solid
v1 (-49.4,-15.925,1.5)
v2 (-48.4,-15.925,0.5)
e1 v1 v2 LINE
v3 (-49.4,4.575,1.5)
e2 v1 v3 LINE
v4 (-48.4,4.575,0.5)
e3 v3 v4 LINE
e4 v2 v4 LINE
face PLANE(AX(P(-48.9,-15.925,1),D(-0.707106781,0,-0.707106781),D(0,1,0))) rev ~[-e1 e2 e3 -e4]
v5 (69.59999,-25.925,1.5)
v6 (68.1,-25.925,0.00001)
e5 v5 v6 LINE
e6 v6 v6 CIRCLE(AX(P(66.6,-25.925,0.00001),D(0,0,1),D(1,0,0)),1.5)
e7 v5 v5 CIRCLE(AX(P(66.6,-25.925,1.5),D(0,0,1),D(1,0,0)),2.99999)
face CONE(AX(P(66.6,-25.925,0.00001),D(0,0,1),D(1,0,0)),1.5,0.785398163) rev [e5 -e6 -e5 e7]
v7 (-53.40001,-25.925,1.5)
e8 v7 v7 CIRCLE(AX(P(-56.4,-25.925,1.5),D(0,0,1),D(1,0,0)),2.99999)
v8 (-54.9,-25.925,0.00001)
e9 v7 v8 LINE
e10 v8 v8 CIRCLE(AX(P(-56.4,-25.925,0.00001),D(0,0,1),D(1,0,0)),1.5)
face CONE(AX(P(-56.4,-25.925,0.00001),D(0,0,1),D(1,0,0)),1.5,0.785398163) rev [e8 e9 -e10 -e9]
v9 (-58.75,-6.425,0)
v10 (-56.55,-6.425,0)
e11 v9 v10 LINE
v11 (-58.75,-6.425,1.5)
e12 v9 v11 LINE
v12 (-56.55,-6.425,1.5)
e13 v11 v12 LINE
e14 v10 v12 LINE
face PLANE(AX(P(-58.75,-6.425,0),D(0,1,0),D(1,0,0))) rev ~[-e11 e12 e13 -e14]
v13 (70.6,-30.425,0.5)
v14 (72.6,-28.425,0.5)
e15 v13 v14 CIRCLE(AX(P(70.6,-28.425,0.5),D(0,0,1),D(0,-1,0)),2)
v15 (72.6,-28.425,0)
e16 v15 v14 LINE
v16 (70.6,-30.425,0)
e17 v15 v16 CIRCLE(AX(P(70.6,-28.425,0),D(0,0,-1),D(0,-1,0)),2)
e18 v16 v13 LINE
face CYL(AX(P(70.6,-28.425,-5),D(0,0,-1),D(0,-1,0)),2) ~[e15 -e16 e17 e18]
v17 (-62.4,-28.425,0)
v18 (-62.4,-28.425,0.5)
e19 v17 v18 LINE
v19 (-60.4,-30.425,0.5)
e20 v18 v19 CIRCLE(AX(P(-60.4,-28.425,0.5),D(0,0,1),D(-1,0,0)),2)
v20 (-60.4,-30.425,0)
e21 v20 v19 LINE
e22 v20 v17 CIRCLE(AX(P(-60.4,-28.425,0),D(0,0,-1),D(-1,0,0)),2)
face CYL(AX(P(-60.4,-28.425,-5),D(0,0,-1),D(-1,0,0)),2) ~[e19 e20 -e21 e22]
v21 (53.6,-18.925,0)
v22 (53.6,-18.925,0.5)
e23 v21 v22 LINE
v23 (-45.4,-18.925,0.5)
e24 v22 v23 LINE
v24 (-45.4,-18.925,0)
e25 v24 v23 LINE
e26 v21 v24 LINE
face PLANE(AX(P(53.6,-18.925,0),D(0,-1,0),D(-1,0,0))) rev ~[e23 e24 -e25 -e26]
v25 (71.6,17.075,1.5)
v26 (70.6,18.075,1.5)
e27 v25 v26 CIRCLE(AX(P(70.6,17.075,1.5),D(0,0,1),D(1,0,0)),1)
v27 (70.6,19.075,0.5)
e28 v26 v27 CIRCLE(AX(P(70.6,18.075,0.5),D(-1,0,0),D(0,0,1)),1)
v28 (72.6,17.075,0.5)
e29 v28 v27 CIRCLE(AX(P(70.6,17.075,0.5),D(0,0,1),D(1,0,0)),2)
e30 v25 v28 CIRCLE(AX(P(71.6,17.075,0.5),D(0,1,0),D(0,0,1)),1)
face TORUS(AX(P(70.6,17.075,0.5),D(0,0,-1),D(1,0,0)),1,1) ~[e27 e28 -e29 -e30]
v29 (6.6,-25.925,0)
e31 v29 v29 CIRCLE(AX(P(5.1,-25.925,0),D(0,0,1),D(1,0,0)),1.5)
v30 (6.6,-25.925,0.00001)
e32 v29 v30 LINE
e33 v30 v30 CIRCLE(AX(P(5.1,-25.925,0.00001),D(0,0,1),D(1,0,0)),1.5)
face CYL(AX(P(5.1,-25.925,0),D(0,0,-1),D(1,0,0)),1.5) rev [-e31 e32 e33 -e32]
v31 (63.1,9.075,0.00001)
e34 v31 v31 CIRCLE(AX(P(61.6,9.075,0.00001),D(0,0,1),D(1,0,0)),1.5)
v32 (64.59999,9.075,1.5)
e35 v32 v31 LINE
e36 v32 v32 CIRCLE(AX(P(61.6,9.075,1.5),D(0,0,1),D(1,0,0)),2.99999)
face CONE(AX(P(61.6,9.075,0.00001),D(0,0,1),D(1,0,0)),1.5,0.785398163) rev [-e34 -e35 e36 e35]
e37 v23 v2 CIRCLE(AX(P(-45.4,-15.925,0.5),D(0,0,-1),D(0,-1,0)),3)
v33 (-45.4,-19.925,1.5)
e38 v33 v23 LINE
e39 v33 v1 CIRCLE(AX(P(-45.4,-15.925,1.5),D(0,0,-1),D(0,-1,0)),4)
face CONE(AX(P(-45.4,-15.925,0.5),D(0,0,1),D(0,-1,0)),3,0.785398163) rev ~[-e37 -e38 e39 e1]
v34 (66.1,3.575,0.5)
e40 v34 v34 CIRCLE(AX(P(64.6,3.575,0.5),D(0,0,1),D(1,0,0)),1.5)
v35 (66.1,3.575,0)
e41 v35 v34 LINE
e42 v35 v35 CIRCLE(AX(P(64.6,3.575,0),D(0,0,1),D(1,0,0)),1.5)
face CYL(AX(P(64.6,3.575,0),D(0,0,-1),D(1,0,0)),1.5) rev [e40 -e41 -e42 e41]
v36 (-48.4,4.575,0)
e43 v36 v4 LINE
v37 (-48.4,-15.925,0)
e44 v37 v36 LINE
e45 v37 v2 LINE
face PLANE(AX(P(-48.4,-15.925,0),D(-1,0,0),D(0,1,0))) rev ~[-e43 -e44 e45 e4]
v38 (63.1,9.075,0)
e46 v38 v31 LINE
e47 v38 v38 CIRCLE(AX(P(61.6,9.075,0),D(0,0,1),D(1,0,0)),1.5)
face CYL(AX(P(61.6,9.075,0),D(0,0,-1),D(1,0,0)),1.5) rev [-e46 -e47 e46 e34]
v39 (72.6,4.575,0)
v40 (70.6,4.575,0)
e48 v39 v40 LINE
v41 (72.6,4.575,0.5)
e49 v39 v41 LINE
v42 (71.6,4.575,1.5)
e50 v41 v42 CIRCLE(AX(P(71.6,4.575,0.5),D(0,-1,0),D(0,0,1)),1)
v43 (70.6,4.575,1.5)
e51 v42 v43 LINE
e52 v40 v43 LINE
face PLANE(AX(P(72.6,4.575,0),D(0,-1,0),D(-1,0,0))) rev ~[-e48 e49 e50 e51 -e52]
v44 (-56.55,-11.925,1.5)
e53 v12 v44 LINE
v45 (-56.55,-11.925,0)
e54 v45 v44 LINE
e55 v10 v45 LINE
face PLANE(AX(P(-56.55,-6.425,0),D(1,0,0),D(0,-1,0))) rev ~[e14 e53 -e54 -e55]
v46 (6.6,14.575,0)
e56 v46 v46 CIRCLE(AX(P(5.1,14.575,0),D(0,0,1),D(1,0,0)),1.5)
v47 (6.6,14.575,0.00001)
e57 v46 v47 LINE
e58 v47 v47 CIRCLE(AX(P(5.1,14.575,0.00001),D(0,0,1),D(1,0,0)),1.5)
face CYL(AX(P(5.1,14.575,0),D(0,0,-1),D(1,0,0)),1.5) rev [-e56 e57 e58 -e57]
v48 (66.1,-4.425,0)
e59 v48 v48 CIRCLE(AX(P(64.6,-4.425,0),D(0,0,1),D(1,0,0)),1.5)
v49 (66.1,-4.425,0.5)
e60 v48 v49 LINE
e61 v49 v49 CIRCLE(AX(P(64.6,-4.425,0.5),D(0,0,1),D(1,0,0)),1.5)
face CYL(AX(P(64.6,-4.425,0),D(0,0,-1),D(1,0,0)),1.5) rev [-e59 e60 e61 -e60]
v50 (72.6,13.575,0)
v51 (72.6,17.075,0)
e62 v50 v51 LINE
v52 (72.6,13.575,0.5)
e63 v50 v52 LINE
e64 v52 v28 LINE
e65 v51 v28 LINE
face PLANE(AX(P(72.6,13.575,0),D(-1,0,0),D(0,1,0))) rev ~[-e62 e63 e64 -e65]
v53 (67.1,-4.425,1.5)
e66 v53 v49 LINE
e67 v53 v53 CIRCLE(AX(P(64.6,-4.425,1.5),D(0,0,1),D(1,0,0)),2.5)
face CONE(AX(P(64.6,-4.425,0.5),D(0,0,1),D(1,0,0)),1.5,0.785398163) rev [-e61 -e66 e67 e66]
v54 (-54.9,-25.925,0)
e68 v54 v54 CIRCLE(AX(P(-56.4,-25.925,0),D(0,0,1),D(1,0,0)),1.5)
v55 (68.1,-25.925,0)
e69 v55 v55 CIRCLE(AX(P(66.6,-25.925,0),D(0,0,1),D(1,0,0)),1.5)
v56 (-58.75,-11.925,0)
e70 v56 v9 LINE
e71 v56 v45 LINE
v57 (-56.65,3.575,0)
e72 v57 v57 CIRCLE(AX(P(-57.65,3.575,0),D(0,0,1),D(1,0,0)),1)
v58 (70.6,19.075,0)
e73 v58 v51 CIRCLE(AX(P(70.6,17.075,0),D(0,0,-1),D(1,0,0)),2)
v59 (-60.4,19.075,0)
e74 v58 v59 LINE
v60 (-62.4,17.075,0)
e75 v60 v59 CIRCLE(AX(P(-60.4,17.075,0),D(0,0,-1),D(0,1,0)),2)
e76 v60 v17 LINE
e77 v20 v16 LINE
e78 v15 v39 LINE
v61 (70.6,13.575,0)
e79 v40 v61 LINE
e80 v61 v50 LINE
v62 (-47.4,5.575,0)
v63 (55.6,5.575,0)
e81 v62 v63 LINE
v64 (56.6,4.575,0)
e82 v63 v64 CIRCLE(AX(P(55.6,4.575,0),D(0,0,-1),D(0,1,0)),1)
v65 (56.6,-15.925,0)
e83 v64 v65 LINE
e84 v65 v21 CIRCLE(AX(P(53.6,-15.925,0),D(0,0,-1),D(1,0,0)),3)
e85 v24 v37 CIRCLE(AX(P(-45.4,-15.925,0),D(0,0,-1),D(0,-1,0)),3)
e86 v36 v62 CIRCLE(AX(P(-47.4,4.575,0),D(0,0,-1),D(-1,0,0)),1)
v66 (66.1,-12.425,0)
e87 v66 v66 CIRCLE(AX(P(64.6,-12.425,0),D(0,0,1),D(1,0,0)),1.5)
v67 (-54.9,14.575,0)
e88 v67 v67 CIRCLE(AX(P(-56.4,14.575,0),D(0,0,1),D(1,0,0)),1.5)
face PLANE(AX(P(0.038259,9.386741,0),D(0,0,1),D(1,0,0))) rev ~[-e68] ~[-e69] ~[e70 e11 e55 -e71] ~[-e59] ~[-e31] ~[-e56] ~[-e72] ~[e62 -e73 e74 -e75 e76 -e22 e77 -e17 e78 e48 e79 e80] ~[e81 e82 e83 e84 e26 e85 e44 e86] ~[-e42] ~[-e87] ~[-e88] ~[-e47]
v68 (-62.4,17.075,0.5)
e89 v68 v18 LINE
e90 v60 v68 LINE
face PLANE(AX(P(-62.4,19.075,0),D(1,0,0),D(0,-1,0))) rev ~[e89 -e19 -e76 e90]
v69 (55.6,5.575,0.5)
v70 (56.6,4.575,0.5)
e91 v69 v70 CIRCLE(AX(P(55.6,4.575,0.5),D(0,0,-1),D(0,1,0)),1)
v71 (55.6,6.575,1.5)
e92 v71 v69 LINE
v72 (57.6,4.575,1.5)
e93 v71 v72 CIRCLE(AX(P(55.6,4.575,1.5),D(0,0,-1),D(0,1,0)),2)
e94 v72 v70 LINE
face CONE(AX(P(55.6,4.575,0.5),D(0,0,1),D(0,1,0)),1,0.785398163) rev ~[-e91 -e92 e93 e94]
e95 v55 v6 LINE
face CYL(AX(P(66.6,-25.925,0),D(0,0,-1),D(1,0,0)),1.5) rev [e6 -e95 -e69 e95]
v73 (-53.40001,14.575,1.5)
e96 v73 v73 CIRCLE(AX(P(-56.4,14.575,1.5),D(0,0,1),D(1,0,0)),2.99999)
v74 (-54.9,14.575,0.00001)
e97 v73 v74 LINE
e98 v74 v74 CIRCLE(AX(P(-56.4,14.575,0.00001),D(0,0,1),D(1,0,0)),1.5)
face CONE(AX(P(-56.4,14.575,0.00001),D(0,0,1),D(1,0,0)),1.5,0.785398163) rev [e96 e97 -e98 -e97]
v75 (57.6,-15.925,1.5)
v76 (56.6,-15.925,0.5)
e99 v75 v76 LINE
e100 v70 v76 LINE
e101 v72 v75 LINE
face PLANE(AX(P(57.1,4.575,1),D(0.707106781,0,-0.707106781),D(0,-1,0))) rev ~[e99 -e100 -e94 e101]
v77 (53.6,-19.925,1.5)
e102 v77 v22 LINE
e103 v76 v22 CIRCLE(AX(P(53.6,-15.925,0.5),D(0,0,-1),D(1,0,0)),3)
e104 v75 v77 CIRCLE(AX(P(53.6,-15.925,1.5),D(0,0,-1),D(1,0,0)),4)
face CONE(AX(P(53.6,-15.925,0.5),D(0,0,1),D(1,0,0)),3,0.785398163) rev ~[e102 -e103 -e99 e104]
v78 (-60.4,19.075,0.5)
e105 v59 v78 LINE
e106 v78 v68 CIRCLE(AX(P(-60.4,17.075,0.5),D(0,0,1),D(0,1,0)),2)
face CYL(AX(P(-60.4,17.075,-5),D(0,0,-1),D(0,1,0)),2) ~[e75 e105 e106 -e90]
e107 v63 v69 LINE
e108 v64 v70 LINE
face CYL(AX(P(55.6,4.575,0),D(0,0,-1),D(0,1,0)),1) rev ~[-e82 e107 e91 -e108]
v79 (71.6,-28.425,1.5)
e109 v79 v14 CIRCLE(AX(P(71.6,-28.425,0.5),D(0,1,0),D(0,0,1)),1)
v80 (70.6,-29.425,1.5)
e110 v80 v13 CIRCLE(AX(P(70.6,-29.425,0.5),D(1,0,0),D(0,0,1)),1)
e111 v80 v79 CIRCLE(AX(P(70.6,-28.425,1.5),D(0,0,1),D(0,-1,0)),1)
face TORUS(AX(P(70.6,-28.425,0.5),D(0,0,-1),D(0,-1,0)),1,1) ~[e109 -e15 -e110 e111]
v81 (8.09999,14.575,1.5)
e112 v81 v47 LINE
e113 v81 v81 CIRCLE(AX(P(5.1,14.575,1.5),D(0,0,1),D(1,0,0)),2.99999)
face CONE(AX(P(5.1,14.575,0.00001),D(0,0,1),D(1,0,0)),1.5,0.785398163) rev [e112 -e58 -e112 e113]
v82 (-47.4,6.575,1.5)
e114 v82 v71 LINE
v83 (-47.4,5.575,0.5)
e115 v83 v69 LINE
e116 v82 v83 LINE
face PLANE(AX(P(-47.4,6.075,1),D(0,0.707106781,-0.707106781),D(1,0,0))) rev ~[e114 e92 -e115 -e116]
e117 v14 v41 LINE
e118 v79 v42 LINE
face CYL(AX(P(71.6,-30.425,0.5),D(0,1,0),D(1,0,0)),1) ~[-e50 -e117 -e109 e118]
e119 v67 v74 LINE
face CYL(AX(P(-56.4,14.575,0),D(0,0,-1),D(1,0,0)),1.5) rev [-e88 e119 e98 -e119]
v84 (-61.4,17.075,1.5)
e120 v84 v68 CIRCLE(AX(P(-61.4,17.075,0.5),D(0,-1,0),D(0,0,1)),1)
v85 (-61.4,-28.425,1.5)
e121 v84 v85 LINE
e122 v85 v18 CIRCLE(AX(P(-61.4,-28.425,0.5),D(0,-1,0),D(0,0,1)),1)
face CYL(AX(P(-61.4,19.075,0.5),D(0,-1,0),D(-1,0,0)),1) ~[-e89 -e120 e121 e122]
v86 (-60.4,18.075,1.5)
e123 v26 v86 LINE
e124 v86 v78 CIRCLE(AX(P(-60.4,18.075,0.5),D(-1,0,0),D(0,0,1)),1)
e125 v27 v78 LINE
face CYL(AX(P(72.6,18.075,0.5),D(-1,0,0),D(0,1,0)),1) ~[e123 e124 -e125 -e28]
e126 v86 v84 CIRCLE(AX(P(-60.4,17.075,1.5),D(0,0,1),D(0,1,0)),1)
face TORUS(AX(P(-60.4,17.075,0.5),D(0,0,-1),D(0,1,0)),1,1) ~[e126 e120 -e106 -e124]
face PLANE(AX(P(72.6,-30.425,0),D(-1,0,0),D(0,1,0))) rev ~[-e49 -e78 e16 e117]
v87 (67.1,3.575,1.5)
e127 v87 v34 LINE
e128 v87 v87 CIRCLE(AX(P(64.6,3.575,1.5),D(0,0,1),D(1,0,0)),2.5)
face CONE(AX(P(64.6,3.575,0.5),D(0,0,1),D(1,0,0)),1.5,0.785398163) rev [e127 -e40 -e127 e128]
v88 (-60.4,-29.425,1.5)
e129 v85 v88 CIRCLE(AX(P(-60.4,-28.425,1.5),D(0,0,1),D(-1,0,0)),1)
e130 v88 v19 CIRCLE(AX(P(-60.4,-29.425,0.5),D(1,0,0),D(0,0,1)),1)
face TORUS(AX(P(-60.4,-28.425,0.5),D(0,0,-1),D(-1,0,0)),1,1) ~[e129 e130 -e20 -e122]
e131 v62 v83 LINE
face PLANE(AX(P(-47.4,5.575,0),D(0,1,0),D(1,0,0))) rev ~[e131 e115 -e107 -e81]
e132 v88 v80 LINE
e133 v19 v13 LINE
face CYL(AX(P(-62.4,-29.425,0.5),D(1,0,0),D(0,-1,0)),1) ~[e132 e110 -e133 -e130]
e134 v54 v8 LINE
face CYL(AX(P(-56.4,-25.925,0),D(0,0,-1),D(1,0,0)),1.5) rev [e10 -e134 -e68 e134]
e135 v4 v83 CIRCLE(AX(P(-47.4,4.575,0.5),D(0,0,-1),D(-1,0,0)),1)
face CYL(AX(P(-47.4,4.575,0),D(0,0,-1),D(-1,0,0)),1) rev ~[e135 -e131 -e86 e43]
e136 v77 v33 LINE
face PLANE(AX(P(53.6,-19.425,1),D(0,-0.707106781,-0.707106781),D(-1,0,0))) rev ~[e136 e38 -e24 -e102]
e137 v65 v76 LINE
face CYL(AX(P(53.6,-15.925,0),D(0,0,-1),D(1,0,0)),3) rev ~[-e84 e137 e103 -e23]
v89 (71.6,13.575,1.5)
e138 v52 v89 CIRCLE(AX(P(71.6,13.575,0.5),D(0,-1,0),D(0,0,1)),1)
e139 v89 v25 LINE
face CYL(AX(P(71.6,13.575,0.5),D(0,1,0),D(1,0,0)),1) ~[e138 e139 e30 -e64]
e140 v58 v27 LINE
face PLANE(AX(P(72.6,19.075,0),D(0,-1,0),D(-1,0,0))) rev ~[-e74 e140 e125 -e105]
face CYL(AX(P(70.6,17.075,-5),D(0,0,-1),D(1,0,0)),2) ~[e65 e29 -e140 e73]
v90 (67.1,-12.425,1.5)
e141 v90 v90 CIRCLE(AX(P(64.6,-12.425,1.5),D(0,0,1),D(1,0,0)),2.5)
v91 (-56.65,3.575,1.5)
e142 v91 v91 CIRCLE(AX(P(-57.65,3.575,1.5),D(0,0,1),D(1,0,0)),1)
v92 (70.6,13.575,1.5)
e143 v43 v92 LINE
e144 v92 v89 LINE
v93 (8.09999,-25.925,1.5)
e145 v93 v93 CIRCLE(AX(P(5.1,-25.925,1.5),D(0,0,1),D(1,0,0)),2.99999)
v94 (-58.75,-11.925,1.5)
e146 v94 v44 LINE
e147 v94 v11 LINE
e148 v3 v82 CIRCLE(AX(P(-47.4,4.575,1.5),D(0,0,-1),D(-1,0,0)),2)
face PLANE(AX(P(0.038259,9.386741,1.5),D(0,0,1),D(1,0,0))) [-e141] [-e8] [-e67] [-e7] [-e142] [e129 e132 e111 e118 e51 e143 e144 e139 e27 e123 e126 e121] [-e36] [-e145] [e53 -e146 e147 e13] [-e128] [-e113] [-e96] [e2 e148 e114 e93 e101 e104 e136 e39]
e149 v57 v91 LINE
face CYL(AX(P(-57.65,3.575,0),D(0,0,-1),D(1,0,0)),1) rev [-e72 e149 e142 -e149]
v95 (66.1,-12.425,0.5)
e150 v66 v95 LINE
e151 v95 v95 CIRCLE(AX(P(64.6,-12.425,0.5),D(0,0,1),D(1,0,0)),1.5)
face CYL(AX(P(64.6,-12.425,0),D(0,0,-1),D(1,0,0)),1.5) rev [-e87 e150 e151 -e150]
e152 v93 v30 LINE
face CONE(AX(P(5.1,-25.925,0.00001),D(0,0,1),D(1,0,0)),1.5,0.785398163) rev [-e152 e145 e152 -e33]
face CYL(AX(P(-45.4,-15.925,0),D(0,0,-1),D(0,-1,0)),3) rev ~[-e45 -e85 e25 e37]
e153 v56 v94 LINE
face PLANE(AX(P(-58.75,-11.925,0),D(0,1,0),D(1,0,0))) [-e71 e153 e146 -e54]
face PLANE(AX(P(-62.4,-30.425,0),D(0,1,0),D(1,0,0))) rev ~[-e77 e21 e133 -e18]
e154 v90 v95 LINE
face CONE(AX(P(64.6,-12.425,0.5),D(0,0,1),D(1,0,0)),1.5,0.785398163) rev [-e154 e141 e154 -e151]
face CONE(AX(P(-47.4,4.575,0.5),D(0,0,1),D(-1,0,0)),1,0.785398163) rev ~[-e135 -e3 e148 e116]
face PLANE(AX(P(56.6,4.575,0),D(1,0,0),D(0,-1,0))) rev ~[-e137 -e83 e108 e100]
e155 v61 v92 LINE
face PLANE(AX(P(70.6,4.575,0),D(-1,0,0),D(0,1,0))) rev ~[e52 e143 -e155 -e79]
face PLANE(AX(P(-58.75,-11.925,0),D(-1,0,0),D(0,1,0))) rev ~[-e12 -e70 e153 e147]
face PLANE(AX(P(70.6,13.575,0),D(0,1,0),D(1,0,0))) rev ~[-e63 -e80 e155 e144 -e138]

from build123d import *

# Parameters (mm, degrees)
F0_W         = 112.5
F0_H         = 7
F0_R         = 1.5
F0_W_2       = 135
F0_W_3       = 2
F0_H_2       = 2
F0_H_3       = 9
F0_W_4       = 5.5
F0_R_2       = 1
F0_W_5       = 2.2
F0_H_4       = 3.5
F0_H_5       = 9.5
F1_DEPTH     = 1.5
F2_R         = 1
F3_T1_DEPTH  = 6.5
F3_T4_ANGLE  = 90
F3_T6_ANGLE  = 90
F3_T8_ANGLE  = 90
F3_T10_ANGLE = 90
F4_SIZE      = 1
F5_SIZE      = 1
F6_SIZE      = 1.49999


# Not quite as in the source:
# - a fillet or chamfer that OpenCascade refuses, or shapes differently, is made with other operations: its cross-section is extruded or revolved along the edge and cut away or added
# - a fillet or chamfer is up to 0.001 mm smaller than in the source, because OpenCascade refuses the exact size
# - a feature names something its author has since deleted; it is built from what else it names


with BuildPart() as f1:
    # F0 (on Top) → F1 (new body)
    with BuildSketch(Plane.XY):
        Polygon((54.1, 8.075), (54.1, 17.075), (52.1, 17.075), (52.1, 10.075), (-60.4, 10.075), (-60.4, 8.075), (-54.9, 8.075), align=None)
        Polygon((-60.4, 17.075), (52.1, 17.075), (52.1, 19.075), (-62.4, 19.075), (-62.4, 10.075), (-60.4, 10.075), align=None)
        with Locations((-4.15, 13.575)):
            Rectangle(F0_W, F0_H)
        with Locations((-56.4, 14.575)):
            Circle(F0_R, mode=Mode.SUBTRACT)
        with Locations((5.1, 14.575)):
            Circle(F0_R, mode=Mode.SUBTRACT)
        Polygon((54.1, 17.075), (70.6, 17.075), (70.6, 13.575), (72.6, 13.575), (72.6, 19.075), (52.1, 19.075), (52.1, 17.075), align=None)
        Polygon((70.6, 13.575), (70.6, 17.075), (54.1, 17.075), (54.1, 8.075), (-54.9, 8.075), (-54.9, -0.925), (-54.9, -2.925), (-54.9, -21.425), (70.6, -21.425), (70.6, 4.575), align=None)
        with BuildLine():
            Line((56.6, 4.575), (56.6, -15.925))
            ThreePointArc((56.6, -15.925), (55.7213203436, -18.0463203436), (53.6, -18.925))
            Line((53.6, -18.925), (-45.4, -18.925))
            ThreePointArc((-45.4, -18.925), (-47.5213203436, -18.0463203436), (-48.4, -15.925))
            Line((-48.4, -15.925), (-48.4, 4.575))
            ThreePointArc((-48.4, 4.575), (-48.1071067812, 5.2821067812), (-47.4, 5.575))
            Line((-47.4, 5.575), (55.6, 5.575))
            ThreePointArc((55.6, 5.575), (56.3071067812, 5.2821067812), (56.6, 4.575))
        make_face(mode=Mode.SUBTRACT)
        with Locations((64.6, -12.425)):
            Circle(F0_R, mode=Mode.SUBTRACT)
        with Locations((64.6, -4.425)):
            Circle(F0_R, mode=Mode.SUBTRACT)
        with Locations((64.6, 3.575)):
            Circle(F0_R, mode=Mode.SUBTRACT)
        with Locations((61.6, 9.075)):
            Circle(F0_R, mode=Mode.SUBTRACT)
        Polygon((72.6, 4.575), (70.6, 4.575), (70.6, -21.425), (-54.9, -21.425), (-56.55, -21.425), (-58.75, -21.425), (-60.4, -21.425), (-60.4, -2.925), (-62.4, -2.925), (-62.4, -23.425), (72.6, -23.425), align=None)
        with Locations((5.1, -26.925)):
            Rectangle(F0_W_2, F0_H)
        with Locations((-56.4, -25.925)):
            Circle(F0_R, mode=Mode.SUBTRACT)
        with Locations((5.1, -25.925)):
            Circle(F0_R, mode=Mode.SUBTRACT)
        with Locations((66.6, -25.925)):
            Circle(F0_R, mode=Mode.SUBTRACT)
        with Locations((-61.4, 9.075)):
            Rectangle(F0_W_3, F0_H_2)
        with Locations((-61.4, 3.575)):
            Rectangle(F0_W_3, F0_H_3)
        with Locations((-61.4, -1.925)):
            Rectangle(F0_W_3, F0_H_2)
        with Locations((-57.65, 3.575)):
            Rectangle(F0_W_4, F0_H_3)
        with Locations((-57.65, 3.575)):
            Circle(F0_R_2, mode=Mode.SUBTRACT)
        Polygon((-54.9, -2.925), (-54.9, -0.925), (-60.4, -0.925), (-60.4, -2.925), (-58.75, -2.925), (-56.55, -2.925), align=None)
        with Locations((-57.65, -4.675)):
            Rectangle(F0_W_5, F0_H_4)
        Polygon((-56.55, -21.425), (-54.9, -21.425), (-54.9, -2.925), (-56.55, -2.925), (-56.55, -6.425), (-56.55, -11.925), align=None)
        Polygon((-58.75, -2.925), (-60.4, -2.925), (-60.4, -21.425), (-58.75, -21.425), (-58.75, -11.925), (-58.75, -6.425), align=None)
        with Locations((-57.65, -16.675)):
            Rectangle(F0_W_5, F0_H_5)
    extrude(amount=F1_DEPTH)

    # F2
    f2_edges = [f1.edges().sort_by_distance(p)[0] for p in [
        (-62.4, -5.675, 1.5),
        (5.1, 19.075, 1.5),
        (72.6, 16.325, 1.5),
        (72.6, -12.925, 1.5),
        (5.1, -30.425, 1.5),
    ]]
    fillet(f2_edges, radius=F2_R)

    # F3: fillet of radius 2 on 4 edges, made by hand

    # F3_s2 → F3_t1 (cut)
    with BuildSketch(Plane.XY.offset(-5)):
        with BuildLine():
            ThreePointArc((-60.4, 19.075), (-61.8142135624, 18.4892135624), (-62.4, 17.075))
            Line((-62.4, 17.075), (-62.4, 19.075))
            Line((-62.4, 19.075), (-60.4, 19.075))
        make_face()
        with BuildLine():
            ThreePointArc((72.6, 17.075), (72.0142135624, 18.4892135624), (70.6, 19.075))
            Line((70.6, 19.075), (72.6, 19.075))
            Line((72.6, 19.075), (72.6, 17.075))
        make_face()
        with BuildLine():
            ThreePointArc((70.6, -30.425), (72.0142135624, -29.8392135624), (72.6, -28.425))
            Line((72.6, -28.425), (72.6, -30.425))
            Line((72.6, -30.425), (70.6, -30.425))
        make_face()
        with BuildLine():
            ThreePointArc((-62.4, -28.425), (-61.8142135624, -29.8392135624), (-60.4, -30.425))
            Line((-60.4, -30.425), (-62.4, -30.425))
            Line((-62.4, -30.425), (-62.4, -28.425))
        make_face()
    extrude(amount=F3_T1_DEPTH, mode=Mode.SUBTRACT)

    # F3_s3 → F3_t4 (revolve, cut)
    with BuildSketch(Plane.XZ.offset(28.425)):
        with BuildLine():
            ThreePointArc((-61.4, 1.5), (-62.1071067812, 1.2071067812), (-62.4, 0.5))
            Line((-62.4, 0.5), (-62.4, 1.5))
            Line((-62.4, 1.5), (-61.4, 1.5))
        make_face()
    revolve(axis=Axis((-60.4, -28.425, 1.5), (0, 0, 1)), revolution_arc=F3_T4_ANGLE, mode=Mode.SUBTRACT)

    # F3_s5 → F3_t6 (revolve, cut)
    with BuildSketch(Plane.YZ.offset(70.6)):
        with BuildLine():
            ThreePointArc((-29.425, 1.5), (-30.1321067812, 1.2071067812), (-30.425, 0.5))
            Line((-30.425, 0.5), (-30.425, 1.5))
            Line((-30.425, 1.5), (-29.425, 1.5))
        make_face()
    revolve(axis=Axis((70.6, -28.425, 1.5), (0, 0, 1)), revolution_arc=F3_T6_ANGLE, mode=Mode.SUBTRACT)

    # F3_s7 → F3_t8 (revolve, cut)
    with BuildSketch(Plane.XZ.offset(-17.075)):
        with BuildLine():
            ThreePointArc((71.6, 1.5), (72.3071067812, 1.2071067812), (72.6, 0.5))
            Line((72.6, 0.5), (72.6, 1.5))
            Line((72.6, 1.5), (71.6, 1.5))
        make_face()
    revolve(axis=Axis((70.6, 17.075, 1.5), (0, 0, 1)), revolution_arc=F3_T8_ANGLE, mode=Mode.SUBTRACT)

    # F3_s9 → F3_t10 (revolve, cut)
    with BuildSketch(Plane.YZ.offset(-60.4)):
        with BuildLine():
            ThreePointArc((18.075, 1.5), (18.7821067812, 1.2071067812), (19.075, 0.5))
            Line((19.075, 0.5), (19.075, 1.5))
            Line((19.075, 1.5), (18.075, 1.5))
        make_face()
    revolve(axis=Axis((-60.4, 17.075, 1.5), (0, 0, 1)), revolution_arc=F3_T10_ANGLE, mode=Mode.SUBTRACT)

    # F4
    f4_edges = [f1.edges().sort_by_distance(p)[0] for p in [
        (4.1, 5.575, 1.5),
        (55.72132, -18.04632, 1.5),
        (56.6, -5.675, 1.5),
        (56.307107, 5.282107, 1.5),
    ]]
    chamfer(f4_edges, length=F4_SIZE)

    # F5
    f5_edges = [f1.edges().sort_by_distance(p)[0] for p in [
        (63.1, 3.575, 1.5),
        (63.1, -4.425, 1.5),
        (63.1, -12.425, 1.5),
    ]]
    chamfer(f5_edges, length=F5_SIZE)

    # F6 (size 1.5 in the source; OpenCascade refuses exactly that, so slightly less here)
    f6_edges = [f1.edges().sort_by_distance(p)[0] for p in [
        (3.6, 14.575, 1.5),
        (60.1, 9.075, 1.5),
        (65.1, -25.925, 1.5),
        (3.6, -25.925, 1.5),
        (-57.9, -25.925, 1.5),
        (-57.9, 14.575, 1.5),
    ]]
    chamfer(f6_edges, length=F6_SIZE)


solid = f1.part
